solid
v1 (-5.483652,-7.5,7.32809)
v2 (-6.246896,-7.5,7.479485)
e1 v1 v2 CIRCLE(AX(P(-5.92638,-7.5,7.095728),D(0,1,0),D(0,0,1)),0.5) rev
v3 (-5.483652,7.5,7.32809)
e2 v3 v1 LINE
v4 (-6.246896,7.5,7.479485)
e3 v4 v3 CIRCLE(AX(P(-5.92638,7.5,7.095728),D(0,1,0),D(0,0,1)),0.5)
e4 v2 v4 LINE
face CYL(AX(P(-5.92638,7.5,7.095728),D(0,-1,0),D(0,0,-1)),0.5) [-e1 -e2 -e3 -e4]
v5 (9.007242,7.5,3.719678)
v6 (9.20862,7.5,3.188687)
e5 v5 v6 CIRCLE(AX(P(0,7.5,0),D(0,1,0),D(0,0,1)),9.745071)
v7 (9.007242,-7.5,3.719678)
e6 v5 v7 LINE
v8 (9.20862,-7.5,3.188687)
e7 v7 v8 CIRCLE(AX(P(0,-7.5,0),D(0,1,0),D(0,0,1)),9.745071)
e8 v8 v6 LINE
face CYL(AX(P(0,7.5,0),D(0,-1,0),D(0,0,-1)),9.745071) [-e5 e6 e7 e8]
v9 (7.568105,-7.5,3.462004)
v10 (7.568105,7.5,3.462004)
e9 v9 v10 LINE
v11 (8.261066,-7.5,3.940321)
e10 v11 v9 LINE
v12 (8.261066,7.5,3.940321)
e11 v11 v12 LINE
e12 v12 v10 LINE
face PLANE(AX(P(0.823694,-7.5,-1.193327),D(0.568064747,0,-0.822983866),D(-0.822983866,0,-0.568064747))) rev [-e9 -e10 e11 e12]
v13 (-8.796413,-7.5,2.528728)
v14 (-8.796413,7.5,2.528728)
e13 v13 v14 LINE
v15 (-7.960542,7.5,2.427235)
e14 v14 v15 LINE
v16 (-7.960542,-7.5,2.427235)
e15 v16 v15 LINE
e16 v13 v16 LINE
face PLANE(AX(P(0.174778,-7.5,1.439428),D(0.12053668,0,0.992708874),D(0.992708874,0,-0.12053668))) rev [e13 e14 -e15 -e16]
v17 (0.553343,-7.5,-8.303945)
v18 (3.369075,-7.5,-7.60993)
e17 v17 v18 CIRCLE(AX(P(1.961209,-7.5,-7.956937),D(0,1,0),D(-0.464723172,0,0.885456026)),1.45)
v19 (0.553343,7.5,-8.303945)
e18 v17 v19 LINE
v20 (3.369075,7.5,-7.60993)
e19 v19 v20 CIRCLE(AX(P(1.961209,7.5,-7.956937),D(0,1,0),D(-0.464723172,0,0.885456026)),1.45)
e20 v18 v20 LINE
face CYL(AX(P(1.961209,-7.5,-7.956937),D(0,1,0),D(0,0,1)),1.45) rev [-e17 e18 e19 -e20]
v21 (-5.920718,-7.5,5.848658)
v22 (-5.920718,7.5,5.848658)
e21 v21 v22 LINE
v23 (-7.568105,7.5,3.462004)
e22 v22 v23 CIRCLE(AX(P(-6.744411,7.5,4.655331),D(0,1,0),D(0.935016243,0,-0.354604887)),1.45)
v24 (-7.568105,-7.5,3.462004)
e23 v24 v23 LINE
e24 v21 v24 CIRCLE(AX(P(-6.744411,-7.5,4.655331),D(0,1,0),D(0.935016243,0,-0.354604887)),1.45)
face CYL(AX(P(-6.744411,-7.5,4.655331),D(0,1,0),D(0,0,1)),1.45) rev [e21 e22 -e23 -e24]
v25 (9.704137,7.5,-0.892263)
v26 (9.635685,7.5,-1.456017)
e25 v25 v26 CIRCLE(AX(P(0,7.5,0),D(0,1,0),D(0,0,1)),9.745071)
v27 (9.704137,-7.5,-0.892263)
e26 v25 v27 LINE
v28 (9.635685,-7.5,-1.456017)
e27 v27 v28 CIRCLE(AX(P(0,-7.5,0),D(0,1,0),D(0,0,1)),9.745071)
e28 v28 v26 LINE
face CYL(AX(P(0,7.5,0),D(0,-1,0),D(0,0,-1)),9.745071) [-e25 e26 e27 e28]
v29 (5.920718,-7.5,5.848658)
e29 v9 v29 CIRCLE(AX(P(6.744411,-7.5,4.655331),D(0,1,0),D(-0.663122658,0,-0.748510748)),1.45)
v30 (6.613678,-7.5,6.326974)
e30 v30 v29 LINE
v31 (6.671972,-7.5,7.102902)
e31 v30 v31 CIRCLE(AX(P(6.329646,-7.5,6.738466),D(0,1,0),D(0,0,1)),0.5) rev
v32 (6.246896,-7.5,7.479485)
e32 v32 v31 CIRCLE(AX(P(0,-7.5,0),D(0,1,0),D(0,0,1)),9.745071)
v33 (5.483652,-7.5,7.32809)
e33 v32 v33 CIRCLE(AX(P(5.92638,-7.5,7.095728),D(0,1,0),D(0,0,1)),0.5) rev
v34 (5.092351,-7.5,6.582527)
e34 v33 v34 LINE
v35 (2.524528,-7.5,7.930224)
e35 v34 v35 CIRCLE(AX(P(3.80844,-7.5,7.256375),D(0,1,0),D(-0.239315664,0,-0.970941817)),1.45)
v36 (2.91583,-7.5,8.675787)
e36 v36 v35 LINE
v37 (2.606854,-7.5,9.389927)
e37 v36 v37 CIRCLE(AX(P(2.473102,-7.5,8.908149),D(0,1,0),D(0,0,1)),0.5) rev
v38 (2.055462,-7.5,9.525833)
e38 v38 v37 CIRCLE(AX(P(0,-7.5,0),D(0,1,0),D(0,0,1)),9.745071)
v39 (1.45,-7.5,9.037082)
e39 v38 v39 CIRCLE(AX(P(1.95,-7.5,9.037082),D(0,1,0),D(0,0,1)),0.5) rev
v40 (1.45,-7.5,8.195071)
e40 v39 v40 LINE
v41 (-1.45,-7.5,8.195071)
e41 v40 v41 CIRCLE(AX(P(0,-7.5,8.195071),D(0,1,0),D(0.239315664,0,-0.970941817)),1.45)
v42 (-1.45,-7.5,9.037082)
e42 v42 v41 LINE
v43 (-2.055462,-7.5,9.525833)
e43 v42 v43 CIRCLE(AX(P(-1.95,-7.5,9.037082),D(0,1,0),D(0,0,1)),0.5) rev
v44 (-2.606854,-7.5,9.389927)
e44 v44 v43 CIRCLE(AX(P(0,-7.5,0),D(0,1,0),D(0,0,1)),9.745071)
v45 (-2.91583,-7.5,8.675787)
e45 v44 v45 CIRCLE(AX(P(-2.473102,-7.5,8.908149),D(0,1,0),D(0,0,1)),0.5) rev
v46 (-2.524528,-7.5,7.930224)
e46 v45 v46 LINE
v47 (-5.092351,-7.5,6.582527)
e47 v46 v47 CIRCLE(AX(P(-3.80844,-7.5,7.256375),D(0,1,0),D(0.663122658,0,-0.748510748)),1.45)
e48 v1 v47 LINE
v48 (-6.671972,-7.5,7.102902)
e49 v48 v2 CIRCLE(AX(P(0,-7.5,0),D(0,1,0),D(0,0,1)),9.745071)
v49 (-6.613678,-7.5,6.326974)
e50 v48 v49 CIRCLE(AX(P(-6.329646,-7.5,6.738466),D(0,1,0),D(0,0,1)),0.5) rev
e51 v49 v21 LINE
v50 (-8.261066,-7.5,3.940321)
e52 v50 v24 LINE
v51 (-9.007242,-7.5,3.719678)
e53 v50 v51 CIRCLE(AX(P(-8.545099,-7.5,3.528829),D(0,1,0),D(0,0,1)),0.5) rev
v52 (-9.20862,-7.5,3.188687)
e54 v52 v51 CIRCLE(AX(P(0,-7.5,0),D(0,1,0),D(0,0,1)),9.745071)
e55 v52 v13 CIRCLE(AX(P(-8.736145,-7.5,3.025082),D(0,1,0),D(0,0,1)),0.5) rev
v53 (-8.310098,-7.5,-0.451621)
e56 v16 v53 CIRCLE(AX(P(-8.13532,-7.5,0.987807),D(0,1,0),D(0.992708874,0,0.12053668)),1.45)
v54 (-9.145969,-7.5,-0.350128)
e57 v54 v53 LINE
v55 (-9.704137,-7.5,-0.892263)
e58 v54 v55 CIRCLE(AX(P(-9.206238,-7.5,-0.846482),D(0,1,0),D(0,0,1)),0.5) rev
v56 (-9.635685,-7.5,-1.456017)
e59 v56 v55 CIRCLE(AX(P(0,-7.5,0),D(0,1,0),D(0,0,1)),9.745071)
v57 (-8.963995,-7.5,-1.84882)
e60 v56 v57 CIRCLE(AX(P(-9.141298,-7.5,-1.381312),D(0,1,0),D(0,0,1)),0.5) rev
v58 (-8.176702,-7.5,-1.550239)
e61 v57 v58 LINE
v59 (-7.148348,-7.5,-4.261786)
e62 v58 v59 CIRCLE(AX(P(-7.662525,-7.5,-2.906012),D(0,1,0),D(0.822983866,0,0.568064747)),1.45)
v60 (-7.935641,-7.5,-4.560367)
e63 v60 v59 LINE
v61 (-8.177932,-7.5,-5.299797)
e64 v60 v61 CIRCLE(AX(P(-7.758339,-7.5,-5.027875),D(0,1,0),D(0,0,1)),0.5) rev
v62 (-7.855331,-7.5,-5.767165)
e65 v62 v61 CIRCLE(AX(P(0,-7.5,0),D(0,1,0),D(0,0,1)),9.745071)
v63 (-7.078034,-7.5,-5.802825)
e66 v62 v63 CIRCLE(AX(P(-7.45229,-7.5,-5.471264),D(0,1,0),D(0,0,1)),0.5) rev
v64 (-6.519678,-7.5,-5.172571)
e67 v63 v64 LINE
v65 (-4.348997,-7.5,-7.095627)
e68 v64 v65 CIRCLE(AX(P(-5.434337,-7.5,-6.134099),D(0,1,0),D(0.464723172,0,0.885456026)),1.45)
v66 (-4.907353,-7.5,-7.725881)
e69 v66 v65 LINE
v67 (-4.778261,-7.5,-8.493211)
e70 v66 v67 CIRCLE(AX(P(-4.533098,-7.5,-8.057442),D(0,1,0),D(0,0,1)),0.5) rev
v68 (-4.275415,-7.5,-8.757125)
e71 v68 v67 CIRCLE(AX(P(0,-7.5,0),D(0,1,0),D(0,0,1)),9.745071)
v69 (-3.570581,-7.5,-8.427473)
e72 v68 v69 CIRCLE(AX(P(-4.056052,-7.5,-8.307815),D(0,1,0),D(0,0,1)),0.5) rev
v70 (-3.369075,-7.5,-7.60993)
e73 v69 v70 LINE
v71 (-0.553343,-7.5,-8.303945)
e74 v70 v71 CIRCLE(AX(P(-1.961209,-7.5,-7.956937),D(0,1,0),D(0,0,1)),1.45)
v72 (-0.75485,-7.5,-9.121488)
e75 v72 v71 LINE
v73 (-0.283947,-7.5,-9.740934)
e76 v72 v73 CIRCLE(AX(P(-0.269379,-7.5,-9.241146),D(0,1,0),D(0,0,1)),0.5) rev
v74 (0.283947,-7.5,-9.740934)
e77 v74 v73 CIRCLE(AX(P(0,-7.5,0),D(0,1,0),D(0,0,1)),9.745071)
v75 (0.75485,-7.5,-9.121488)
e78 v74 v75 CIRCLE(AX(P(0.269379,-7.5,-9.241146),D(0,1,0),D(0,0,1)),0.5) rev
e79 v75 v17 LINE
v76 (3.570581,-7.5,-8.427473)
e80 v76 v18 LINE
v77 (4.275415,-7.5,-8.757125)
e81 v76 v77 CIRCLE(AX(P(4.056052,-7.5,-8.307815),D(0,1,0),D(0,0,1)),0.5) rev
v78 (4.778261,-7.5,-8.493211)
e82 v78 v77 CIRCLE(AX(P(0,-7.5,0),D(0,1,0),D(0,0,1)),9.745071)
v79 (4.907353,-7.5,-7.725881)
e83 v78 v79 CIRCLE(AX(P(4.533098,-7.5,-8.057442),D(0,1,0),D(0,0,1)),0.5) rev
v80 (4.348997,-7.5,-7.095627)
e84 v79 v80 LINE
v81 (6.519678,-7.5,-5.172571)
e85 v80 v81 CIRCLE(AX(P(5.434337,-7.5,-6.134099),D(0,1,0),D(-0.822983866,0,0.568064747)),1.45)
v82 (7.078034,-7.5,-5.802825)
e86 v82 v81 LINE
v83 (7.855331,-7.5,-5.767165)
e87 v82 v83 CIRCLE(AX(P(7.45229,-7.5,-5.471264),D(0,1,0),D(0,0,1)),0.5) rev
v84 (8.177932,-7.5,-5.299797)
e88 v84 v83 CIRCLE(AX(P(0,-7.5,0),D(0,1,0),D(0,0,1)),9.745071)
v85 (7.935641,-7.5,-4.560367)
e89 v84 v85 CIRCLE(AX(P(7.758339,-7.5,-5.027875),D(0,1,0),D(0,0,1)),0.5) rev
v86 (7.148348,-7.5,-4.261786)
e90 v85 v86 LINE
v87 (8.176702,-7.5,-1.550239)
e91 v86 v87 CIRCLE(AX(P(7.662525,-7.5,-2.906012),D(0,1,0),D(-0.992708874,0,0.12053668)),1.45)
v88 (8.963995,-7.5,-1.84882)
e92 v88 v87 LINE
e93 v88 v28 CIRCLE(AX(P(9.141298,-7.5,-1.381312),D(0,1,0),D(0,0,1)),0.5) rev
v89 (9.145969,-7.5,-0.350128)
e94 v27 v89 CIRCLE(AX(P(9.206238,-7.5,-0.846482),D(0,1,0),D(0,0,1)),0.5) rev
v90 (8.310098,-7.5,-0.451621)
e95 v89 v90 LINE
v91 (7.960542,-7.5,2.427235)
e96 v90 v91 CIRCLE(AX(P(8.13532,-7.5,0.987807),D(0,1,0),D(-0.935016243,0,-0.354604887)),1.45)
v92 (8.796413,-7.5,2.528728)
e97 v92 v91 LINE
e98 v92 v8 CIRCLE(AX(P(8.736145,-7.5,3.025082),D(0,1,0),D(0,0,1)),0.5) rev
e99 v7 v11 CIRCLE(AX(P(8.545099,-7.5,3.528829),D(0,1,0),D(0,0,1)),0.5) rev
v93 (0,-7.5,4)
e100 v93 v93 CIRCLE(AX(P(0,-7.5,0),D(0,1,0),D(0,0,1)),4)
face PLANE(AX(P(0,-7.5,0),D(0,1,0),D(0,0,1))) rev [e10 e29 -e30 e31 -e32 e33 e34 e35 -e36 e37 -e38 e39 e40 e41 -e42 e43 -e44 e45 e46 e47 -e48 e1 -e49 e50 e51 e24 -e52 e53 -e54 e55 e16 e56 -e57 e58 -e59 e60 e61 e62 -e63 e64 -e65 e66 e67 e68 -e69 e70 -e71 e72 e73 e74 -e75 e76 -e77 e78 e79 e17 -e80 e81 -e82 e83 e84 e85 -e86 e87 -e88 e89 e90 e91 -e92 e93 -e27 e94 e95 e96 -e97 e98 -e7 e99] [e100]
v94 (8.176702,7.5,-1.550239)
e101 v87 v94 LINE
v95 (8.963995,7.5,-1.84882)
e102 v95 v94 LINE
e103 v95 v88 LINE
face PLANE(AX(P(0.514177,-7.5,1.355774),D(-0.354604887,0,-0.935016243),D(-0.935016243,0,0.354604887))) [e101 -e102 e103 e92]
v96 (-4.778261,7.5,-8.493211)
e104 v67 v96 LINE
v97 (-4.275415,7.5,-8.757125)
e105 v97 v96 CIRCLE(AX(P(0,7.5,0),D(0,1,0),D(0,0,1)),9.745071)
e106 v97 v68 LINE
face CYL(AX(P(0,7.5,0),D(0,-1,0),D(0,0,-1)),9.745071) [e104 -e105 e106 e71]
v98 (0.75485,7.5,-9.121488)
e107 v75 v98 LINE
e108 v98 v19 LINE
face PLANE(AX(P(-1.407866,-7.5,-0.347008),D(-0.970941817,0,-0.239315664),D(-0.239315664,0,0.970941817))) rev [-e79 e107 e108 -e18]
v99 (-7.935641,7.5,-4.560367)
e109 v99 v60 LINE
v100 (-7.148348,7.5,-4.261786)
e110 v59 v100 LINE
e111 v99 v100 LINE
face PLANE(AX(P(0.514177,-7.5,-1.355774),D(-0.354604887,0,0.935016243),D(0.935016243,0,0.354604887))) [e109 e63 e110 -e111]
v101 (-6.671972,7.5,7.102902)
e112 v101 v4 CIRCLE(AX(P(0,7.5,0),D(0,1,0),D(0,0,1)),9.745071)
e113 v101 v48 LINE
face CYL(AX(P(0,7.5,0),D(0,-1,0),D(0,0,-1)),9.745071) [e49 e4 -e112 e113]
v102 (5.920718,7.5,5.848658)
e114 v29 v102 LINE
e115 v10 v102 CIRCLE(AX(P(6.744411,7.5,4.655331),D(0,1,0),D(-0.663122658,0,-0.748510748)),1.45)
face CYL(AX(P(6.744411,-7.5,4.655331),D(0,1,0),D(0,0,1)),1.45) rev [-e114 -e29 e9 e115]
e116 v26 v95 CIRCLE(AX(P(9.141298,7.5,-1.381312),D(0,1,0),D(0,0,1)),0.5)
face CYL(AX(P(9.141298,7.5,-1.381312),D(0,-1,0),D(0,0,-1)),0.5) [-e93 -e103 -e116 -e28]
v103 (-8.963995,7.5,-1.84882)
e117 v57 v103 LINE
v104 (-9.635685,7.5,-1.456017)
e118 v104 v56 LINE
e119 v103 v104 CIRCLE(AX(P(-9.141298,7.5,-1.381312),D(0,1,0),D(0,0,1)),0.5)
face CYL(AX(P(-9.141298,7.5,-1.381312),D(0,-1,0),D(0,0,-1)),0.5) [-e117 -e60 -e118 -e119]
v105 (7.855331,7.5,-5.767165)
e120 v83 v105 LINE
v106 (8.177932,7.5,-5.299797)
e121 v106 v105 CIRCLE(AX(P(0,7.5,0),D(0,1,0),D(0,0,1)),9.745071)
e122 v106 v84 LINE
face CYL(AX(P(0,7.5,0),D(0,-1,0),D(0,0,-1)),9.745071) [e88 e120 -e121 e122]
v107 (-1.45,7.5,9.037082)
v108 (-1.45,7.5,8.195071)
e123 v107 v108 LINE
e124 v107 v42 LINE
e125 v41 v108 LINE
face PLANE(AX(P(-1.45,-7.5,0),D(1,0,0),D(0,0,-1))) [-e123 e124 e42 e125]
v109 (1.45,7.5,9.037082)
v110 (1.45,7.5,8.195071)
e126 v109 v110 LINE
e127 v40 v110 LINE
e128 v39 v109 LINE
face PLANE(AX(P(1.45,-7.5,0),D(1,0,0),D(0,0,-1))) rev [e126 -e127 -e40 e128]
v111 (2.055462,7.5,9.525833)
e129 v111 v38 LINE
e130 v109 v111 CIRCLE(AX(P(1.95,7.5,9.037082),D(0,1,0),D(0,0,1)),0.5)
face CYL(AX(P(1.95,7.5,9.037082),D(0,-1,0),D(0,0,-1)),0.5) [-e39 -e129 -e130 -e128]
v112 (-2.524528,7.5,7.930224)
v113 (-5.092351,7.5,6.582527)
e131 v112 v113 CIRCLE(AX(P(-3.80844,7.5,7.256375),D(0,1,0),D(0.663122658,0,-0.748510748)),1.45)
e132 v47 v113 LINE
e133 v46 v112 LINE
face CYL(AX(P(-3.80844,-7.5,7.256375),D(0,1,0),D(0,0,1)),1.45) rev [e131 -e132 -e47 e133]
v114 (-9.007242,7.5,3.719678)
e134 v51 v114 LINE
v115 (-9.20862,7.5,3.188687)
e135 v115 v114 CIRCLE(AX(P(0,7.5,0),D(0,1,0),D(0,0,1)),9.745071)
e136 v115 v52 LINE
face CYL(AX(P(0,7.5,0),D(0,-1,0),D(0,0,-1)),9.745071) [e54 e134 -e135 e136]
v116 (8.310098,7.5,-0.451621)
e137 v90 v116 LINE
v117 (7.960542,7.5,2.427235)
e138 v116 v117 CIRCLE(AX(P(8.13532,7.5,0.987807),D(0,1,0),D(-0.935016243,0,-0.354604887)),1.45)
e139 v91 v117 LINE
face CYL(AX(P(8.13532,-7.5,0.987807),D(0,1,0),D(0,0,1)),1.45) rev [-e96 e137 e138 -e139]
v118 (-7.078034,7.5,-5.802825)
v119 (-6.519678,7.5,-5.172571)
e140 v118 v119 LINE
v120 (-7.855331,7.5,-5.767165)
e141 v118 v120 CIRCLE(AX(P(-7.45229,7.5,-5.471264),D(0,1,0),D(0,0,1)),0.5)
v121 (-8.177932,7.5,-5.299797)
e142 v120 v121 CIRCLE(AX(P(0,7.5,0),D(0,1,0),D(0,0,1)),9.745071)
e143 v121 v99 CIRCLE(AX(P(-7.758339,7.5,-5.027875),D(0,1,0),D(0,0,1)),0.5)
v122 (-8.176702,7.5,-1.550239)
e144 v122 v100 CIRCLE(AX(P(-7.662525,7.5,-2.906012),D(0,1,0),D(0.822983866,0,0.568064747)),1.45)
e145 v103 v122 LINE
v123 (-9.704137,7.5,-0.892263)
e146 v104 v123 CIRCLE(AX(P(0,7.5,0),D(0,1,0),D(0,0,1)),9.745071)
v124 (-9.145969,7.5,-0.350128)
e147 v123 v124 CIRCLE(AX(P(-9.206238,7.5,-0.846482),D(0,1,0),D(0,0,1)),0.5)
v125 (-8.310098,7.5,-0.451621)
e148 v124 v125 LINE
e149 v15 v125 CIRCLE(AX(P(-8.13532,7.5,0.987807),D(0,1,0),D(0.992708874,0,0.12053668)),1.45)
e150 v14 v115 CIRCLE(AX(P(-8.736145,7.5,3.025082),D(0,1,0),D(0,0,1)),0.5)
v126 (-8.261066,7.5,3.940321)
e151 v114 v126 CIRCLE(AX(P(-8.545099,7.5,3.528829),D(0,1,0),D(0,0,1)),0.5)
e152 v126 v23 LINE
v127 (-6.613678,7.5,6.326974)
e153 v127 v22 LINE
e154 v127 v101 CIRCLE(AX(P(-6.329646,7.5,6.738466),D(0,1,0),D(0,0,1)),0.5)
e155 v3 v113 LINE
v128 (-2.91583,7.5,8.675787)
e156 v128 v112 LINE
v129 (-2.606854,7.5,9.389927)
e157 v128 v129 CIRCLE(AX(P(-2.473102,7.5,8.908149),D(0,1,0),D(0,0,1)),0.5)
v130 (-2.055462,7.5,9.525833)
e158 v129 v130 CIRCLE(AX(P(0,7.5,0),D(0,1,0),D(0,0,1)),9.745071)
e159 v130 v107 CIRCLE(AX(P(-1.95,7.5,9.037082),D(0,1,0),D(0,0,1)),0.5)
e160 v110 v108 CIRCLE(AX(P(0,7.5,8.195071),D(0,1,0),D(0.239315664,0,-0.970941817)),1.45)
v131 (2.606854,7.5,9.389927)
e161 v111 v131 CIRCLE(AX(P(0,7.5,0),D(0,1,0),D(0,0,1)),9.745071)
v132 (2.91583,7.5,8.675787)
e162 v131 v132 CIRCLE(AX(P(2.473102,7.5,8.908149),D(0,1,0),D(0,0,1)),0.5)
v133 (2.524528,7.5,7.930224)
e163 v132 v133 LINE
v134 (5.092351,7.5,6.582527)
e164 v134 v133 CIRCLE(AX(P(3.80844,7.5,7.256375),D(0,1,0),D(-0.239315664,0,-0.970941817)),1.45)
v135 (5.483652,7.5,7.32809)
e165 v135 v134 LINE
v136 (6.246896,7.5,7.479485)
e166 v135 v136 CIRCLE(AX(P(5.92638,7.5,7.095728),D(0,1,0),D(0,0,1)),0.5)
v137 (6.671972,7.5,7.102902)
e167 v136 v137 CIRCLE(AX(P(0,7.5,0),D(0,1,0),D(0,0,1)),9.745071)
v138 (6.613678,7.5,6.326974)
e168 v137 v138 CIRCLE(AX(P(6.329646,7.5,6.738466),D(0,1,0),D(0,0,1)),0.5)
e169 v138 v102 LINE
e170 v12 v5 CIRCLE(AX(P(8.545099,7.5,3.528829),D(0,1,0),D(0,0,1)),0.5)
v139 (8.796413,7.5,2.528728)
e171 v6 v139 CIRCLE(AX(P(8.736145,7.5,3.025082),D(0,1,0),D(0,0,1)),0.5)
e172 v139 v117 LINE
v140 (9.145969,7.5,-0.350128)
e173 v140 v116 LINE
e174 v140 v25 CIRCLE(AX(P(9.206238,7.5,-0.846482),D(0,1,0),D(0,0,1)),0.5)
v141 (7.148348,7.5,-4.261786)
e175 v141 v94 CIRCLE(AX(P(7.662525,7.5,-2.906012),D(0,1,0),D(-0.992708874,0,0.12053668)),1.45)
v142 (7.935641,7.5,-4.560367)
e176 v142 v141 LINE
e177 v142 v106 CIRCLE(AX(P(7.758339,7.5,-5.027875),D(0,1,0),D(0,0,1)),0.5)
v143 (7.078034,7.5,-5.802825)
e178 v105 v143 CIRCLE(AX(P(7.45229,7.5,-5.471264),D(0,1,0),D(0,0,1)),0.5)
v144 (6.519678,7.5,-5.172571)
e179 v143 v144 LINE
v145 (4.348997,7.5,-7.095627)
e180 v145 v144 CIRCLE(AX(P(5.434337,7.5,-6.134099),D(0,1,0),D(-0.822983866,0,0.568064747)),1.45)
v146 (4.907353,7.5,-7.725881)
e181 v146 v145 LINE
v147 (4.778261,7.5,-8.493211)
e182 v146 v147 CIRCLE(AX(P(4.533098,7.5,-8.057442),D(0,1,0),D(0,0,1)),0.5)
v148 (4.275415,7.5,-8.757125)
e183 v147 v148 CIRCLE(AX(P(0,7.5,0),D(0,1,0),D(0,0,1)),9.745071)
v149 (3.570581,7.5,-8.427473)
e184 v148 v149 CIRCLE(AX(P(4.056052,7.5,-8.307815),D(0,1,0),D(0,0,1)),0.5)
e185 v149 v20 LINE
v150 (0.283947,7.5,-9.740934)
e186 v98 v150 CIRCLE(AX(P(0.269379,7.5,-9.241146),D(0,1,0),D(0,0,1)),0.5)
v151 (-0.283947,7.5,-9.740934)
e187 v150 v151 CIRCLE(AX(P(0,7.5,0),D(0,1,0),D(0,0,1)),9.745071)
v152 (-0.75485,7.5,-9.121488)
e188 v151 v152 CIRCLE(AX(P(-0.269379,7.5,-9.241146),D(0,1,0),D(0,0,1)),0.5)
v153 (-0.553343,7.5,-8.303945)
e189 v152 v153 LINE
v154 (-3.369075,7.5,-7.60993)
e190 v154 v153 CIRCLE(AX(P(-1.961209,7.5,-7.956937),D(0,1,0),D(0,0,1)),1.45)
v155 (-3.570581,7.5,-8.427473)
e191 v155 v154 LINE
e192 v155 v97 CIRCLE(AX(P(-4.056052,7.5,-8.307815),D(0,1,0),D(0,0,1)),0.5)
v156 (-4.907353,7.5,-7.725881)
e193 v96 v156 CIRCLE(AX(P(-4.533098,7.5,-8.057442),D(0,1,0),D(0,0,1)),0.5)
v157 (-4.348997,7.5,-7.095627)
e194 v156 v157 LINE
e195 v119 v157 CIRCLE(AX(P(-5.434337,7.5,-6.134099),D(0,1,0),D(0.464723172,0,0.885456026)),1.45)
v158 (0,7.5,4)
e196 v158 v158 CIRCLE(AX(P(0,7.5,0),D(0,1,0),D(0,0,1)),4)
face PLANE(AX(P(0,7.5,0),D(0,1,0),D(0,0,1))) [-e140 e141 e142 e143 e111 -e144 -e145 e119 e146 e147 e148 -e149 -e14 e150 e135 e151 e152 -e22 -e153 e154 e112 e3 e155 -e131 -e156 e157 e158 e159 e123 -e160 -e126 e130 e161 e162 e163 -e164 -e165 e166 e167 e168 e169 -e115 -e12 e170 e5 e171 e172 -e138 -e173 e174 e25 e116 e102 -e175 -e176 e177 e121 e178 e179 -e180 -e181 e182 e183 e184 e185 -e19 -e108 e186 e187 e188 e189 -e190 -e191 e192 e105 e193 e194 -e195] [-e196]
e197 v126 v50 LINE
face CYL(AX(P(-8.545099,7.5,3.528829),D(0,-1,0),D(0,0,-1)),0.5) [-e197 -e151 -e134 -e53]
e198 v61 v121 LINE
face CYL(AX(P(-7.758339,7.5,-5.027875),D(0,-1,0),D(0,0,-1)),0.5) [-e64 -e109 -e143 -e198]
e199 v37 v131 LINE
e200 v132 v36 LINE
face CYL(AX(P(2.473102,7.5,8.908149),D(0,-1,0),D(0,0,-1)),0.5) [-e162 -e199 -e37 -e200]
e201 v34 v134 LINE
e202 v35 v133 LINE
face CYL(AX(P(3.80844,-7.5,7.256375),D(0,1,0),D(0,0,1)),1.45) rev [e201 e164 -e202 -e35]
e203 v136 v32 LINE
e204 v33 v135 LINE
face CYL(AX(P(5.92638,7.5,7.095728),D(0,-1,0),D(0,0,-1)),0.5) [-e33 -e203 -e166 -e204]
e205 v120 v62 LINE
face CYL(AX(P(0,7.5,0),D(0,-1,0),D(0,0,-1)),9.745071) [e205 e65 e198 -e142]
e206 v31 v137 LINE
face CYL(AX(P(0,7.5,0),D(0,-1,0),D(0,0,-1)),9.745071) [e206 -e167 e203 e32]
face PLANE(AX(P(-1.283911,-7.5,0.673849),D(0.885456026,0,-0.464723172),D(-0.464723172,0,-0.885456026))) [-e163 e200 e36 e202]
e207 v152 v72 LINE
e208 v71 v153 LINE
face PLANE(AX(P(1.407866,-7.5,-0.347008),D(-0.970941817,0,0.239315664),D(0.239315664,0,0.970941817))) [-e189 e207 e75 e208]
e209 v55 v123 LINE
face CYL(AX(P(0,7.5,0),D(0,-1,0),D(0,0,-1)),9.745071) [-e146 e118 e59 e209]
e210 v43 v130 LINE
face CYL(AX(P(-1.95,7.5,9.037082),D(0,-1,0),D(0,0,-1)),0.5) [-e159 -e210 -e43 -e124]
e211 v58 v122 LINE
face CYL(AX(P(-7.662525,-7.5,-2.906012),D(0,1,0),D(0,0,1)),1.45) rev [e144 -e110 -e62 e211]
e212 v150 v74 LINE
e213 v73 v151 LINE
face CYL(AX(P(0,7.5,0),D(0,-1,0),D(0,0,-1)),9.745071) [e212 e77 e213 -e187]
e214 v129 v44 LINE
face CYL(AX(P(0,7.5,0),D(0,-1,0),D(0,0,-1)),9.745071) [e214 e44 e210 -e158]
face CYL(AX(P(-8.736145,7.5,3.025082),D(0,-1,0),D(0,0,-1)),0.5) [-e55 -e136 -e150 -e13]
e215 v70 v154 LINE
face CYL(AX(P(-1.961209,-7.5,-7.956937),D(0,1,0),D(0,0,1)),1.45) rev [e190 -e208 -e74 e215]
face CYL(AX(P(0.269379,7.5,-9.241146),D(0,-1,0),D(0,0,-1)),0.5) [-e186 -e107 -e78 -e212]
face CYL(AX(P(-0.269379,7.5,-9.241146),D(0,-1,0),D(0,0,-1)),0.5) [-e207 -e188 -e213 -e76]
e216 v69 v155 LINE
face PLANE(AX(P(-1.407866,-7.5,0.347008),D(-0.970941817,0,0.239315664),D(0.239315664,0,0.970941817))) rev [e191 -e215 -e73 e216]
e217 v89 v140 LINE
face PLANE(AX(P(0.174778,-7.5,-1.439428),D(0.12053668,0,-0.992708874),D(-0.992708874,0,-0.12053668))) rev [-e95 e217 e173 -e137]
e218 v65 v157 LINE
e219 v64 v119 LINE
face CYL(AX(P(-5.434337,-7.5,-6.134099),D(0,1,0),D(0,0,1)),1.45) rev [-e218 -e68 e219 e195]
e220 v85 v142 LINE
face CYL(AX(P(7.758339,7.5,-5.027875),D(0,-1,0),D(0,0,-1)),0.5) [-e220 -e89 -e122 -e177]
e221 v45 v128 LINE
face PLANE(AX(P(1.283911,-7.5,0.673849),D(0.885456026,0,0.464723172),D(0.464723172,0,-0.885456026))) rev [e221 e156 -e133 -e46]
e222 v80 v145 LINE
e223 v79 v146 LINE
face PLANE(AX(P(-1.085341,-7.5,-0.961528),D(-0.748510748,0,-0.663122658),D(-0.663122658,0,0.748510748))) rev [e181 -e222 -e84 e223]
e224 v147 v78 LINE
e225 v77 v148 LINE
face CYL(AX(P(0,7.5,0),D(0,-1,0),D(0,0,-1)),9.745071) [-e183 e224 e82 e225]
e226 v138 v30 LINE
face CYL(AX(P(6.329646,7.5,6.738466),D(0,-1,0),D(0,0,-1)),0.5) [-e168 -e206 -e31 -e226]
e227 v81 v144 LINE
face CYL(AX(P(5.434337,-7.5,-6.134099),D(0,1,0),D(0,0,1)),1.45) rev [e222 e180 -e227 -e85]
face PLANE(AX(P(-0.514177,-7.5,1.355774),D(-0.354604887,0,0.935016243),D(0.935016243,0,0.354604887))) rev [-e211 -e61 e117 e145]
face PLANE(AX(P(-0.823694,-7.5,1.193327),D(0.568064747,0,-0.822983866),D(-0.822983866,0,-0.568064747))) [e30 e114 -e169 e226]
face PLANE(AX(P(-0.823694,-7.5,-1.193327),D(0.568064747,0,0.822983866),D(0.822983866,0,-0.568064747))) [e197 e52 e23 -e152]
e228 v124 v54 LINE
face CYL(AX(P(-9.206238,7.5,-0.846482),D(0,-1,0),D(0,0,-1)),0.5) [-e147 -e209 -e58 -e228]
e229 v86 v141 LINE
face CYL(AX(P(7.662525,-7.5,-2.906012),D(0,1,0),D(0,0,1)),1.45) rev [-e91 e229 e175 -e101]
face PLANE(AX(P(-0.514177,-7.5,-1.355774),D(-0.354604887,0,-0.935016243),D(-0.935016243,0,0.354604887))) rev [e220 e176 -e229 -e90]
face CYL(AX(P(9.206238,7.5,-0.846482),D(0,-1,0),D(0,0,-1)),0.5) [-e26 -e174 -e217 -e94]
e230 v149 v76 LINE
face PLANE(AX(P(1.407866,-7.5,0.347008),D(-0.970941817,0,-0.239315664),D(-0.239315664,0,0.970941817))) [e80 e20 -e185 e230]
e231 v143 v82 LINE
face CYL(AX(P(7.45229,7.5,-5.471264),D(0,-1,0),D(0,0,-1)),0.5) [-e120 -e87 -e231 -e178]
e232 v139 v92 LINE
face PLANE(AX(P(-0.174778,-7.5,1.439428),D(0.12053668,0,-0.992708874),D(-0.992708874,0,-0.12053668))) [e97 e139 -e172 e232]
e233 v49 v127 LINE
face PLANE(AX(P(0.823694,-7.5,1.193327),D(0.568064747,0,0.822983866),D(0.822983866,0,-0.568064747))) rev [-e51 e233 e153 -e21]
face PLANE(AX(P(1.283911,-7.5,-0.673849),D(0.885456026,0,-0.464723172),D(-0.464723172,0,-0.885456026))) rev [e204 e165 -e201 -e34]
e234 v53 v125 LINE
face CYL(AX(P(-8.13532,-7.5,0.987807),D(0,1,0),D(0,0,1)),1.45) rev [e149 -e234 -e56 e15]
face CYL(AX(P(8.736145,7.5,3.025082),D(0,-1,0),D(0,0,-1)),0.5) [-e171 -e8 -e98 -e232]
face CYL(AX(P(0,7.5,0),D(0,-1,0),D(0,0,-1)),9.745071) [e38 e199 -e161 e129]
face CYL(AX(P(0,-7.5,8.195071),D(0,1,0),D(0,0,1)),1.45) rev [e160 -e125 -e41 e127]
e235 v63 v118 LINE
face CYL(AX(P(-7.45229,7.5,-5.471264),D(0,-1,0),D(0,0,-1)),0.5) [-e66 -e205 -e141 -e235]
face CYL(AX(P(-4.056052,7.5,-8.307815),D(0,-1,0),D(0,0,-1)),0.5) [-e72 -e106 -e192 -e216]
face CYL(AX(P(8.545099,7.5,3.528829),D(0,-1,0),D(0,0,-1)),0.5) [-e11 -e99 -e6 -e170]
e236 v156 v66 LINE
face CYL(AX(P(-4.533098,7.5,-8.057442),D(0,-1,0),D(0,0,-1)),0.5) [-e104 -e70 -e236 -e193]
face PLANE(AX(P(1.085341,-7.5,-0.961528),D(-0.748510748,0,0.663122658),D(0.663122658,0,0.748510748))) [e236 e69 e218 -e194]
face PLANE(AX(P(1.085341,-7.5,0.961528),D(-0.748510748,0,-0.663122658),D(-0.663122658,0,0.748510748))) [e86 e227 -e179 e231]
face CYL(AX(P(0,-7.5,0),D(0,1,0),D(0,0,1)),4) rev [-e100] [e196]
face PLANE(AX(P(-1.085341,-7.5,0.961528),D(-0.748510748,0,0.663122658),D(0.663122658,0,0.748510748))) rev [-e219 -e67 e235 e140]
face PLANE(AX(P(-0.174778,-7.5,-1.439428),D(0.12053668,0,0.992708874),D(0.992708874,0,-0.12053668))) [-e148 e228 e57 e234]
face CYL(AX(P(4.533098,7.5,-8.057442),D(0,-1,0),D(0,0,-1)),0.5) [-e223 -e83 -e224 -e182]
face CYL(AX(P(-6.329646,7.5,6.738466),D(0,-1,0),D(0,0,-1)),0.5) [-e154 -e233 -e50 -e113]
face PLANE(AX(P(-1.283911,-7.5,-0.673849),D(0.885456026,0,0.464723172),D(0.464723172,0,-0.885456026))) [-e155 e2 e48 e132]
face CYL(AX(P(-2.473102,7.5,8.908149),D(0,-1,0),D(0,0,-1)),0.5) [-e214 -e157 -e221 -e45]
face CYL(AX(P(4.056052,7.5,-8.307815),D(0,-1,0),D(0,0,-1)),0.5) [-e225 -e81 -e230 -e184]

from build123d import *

# Parameters (mm, degrees)
BOSS_EXTRUDE1_DEPTH      = 7.5
CUT_EXTRUDE1_START       = -7.5
CUT_EXTRUDE1_DEPTH       = 15
FILLET1_R                = 0.5
CIRPATTERN1_COUNT        = 13
FILLET1_OF_CIRPATTERN1_R = 0.5
CUT_EXTRUDE2_DEPTH       = 16.666124697
CUT_EXTRUDE2_DEPTH_BACK  = 16.666124697
SKETCH7_R                = 4


# Read off the part's stored shape, not the designer's step: Cut-Extrude1
with BuildPart() as part:
    # Sketch5 → Boss-Extrude1 (new, symmetric)
    with BuildSketch(Plane(origin=(0, 0, 0), x_dir=(1, 0, 0), z_dir=(0, 1, 0))):
        with BuildLine():
            ThreePointArc((-0.898321896, 9.703578331), (-2.332148212, 9.46189724), (-3.714053167, 9.009562905))
            Line((-3.714053167, 9.009562905), (-3.369074568, 7.60992971))
            ThreePointArc((-3.369074568, 7.60992971), (-1.614201219, 6.549071788), (-0.553343297, 8.303945136))
            Line((-0.553343297, 8.303945136), (-0.898321896, 9.703578331))
        make_face()
        with BuildLine():
            Line((-3.369074568, 7.60992971), (-3.714053167, 9.009562905))
            ThreePointArc((-3.714053167, 9.009562905), (-5.420917899, -8.098151875), (9.745071301, 0))
            ThreePointArc((9.745071301, 0), (6.565523731, 7.201410473), (-0.898321896, 9.703578331))
            Line((-0.898321896, 9.703578331), (-0.553343297, 8.303945136))
            ThreePointArc((-0.553343297, 8.303945136), (-1.614201219, 6.549071788), (-3.369074568, 7.60992971))
        make_face()
    extrude(amount=BOSS_EXTRUDE1_DEPTH, both=True)

    # Cut-Extrude1 outline → Cut-Extrude1 (cut)
    with BuildSketch(Plane(origin=(0, 0, 0), x_dir=(1, 0, 0), z_dir=(0, 1, 0)).offset(CUT_EXTRUDE1_START)):
        with BuildLine():
            ThreePointArc((-0.898321896, 9.703578331), (-2.332148212, 9.46189724), (-3.714053167, 9.009562905))
            Line((-3.714053167, 9.009562905), (-3.369074568, 7.60992971))
            ThreePointArc((-3.369074568, 7.60992971), (-1.61420122, 6.549071788), (-0.553343297, 8.303945136))
            Line((-0.553343297, 8.303945136), (-0.898321896, 9.703578331))
        make_face()
    cut_extrude1 = extrude(amount=CUT_EXTRUDE1_DEPTH, mode=Mode.SUBTRACT)

    # Fillet1
    fillet1_edges = [part.edges().sort_by_distance(p)[0] for p in [
        (-3.714053167, 0, -9.009562905),
        (-0.898321896, 0, -9.703578331),
    ]]
    fillet(fillet1_edges, radius=FILLET1_R)

    # CirPattern1: Cut-Extrude1 ×13 about axis
    cirpattern1_axis = Axis((0, 0, 0), (0, 1, 0))
    for i in range(1, CIRPATTERN1_COUNT):
        add(cut_extrude1.rotate(cirpattern1_axis, i * 360 / CIRPATTERN1_COUNT), mode=Mode.SUBTRACT)

    # Fillet1 of CirPattern1
    fillet1_of_cirpattern1_edges = [part.edges().sort_by_distance(p)[0] for p in [
        (-7.475583408, 0, -6.251565194),
        (-5.304902238, 0, -8.174620903),
        (-9.524547581, 0, -2.061409236),
        (-8.496193408, 0, -4.77295634),
        (-9.391552687, 0, 2.600990735),
        (-9.741109059, 0, -0.277865001),
        (-7.107066252, 0, 6.667535074),
        (-8.754454018, 0, 4.280881862),
        (-3.194436588, 0, 9.20662748),
        (-5.762259063, 0, 7.85893028),
        (1.45, 0, 9.636592482),
        (-1.45, 0, 9.636592482),
        (5.762259064, 0, 7.85893028),
        (3.194436589, 0, 9.206627479),
        (8.754454018, 0, 4.280881862),
        (7.107066252, 0, 6.667535073),
        (9.741109059, 0, -0.277865001),
        (9.391552686, 0, 2.600990734),
        (8.496193408, 0, -4.772956341),
        (9.524547581, 0, -2.061409237),
        (5.304902238, 0, -8.174620903),
        (7.475583408, 0, -6.251565194),
        (0.898321896, 0, -9.703578332),
        (3.714053167, 0, -9.009562905),
    ]]
    fillet(fillet1_of_cirpattern1_edges, radius=FILLET1_OF_CIRPATTERN1_R)

    # Sketch7 → Cut-Extrude2 (cut, two sides: drawn at the far end of the back side and taken through both)
    with BuildSketch(Plane(origin=(0, 0, 0), x_dir=(1, 0, 0), z_dir=(0, 1, 0)).offset(-CUT_EXTRUDE2_DEPTH_BACK)):
        with Locations(Location((0, 0, 0), (0, 0, 270))):
            Circle(SKETCH7_R)
    extrude(amount=CUT_EXTRUDE2_DEPTH + CUT_EXTRUDE2_DEPTH_BACK, mode=Mode.SUBTRACT)


solid = part.part
